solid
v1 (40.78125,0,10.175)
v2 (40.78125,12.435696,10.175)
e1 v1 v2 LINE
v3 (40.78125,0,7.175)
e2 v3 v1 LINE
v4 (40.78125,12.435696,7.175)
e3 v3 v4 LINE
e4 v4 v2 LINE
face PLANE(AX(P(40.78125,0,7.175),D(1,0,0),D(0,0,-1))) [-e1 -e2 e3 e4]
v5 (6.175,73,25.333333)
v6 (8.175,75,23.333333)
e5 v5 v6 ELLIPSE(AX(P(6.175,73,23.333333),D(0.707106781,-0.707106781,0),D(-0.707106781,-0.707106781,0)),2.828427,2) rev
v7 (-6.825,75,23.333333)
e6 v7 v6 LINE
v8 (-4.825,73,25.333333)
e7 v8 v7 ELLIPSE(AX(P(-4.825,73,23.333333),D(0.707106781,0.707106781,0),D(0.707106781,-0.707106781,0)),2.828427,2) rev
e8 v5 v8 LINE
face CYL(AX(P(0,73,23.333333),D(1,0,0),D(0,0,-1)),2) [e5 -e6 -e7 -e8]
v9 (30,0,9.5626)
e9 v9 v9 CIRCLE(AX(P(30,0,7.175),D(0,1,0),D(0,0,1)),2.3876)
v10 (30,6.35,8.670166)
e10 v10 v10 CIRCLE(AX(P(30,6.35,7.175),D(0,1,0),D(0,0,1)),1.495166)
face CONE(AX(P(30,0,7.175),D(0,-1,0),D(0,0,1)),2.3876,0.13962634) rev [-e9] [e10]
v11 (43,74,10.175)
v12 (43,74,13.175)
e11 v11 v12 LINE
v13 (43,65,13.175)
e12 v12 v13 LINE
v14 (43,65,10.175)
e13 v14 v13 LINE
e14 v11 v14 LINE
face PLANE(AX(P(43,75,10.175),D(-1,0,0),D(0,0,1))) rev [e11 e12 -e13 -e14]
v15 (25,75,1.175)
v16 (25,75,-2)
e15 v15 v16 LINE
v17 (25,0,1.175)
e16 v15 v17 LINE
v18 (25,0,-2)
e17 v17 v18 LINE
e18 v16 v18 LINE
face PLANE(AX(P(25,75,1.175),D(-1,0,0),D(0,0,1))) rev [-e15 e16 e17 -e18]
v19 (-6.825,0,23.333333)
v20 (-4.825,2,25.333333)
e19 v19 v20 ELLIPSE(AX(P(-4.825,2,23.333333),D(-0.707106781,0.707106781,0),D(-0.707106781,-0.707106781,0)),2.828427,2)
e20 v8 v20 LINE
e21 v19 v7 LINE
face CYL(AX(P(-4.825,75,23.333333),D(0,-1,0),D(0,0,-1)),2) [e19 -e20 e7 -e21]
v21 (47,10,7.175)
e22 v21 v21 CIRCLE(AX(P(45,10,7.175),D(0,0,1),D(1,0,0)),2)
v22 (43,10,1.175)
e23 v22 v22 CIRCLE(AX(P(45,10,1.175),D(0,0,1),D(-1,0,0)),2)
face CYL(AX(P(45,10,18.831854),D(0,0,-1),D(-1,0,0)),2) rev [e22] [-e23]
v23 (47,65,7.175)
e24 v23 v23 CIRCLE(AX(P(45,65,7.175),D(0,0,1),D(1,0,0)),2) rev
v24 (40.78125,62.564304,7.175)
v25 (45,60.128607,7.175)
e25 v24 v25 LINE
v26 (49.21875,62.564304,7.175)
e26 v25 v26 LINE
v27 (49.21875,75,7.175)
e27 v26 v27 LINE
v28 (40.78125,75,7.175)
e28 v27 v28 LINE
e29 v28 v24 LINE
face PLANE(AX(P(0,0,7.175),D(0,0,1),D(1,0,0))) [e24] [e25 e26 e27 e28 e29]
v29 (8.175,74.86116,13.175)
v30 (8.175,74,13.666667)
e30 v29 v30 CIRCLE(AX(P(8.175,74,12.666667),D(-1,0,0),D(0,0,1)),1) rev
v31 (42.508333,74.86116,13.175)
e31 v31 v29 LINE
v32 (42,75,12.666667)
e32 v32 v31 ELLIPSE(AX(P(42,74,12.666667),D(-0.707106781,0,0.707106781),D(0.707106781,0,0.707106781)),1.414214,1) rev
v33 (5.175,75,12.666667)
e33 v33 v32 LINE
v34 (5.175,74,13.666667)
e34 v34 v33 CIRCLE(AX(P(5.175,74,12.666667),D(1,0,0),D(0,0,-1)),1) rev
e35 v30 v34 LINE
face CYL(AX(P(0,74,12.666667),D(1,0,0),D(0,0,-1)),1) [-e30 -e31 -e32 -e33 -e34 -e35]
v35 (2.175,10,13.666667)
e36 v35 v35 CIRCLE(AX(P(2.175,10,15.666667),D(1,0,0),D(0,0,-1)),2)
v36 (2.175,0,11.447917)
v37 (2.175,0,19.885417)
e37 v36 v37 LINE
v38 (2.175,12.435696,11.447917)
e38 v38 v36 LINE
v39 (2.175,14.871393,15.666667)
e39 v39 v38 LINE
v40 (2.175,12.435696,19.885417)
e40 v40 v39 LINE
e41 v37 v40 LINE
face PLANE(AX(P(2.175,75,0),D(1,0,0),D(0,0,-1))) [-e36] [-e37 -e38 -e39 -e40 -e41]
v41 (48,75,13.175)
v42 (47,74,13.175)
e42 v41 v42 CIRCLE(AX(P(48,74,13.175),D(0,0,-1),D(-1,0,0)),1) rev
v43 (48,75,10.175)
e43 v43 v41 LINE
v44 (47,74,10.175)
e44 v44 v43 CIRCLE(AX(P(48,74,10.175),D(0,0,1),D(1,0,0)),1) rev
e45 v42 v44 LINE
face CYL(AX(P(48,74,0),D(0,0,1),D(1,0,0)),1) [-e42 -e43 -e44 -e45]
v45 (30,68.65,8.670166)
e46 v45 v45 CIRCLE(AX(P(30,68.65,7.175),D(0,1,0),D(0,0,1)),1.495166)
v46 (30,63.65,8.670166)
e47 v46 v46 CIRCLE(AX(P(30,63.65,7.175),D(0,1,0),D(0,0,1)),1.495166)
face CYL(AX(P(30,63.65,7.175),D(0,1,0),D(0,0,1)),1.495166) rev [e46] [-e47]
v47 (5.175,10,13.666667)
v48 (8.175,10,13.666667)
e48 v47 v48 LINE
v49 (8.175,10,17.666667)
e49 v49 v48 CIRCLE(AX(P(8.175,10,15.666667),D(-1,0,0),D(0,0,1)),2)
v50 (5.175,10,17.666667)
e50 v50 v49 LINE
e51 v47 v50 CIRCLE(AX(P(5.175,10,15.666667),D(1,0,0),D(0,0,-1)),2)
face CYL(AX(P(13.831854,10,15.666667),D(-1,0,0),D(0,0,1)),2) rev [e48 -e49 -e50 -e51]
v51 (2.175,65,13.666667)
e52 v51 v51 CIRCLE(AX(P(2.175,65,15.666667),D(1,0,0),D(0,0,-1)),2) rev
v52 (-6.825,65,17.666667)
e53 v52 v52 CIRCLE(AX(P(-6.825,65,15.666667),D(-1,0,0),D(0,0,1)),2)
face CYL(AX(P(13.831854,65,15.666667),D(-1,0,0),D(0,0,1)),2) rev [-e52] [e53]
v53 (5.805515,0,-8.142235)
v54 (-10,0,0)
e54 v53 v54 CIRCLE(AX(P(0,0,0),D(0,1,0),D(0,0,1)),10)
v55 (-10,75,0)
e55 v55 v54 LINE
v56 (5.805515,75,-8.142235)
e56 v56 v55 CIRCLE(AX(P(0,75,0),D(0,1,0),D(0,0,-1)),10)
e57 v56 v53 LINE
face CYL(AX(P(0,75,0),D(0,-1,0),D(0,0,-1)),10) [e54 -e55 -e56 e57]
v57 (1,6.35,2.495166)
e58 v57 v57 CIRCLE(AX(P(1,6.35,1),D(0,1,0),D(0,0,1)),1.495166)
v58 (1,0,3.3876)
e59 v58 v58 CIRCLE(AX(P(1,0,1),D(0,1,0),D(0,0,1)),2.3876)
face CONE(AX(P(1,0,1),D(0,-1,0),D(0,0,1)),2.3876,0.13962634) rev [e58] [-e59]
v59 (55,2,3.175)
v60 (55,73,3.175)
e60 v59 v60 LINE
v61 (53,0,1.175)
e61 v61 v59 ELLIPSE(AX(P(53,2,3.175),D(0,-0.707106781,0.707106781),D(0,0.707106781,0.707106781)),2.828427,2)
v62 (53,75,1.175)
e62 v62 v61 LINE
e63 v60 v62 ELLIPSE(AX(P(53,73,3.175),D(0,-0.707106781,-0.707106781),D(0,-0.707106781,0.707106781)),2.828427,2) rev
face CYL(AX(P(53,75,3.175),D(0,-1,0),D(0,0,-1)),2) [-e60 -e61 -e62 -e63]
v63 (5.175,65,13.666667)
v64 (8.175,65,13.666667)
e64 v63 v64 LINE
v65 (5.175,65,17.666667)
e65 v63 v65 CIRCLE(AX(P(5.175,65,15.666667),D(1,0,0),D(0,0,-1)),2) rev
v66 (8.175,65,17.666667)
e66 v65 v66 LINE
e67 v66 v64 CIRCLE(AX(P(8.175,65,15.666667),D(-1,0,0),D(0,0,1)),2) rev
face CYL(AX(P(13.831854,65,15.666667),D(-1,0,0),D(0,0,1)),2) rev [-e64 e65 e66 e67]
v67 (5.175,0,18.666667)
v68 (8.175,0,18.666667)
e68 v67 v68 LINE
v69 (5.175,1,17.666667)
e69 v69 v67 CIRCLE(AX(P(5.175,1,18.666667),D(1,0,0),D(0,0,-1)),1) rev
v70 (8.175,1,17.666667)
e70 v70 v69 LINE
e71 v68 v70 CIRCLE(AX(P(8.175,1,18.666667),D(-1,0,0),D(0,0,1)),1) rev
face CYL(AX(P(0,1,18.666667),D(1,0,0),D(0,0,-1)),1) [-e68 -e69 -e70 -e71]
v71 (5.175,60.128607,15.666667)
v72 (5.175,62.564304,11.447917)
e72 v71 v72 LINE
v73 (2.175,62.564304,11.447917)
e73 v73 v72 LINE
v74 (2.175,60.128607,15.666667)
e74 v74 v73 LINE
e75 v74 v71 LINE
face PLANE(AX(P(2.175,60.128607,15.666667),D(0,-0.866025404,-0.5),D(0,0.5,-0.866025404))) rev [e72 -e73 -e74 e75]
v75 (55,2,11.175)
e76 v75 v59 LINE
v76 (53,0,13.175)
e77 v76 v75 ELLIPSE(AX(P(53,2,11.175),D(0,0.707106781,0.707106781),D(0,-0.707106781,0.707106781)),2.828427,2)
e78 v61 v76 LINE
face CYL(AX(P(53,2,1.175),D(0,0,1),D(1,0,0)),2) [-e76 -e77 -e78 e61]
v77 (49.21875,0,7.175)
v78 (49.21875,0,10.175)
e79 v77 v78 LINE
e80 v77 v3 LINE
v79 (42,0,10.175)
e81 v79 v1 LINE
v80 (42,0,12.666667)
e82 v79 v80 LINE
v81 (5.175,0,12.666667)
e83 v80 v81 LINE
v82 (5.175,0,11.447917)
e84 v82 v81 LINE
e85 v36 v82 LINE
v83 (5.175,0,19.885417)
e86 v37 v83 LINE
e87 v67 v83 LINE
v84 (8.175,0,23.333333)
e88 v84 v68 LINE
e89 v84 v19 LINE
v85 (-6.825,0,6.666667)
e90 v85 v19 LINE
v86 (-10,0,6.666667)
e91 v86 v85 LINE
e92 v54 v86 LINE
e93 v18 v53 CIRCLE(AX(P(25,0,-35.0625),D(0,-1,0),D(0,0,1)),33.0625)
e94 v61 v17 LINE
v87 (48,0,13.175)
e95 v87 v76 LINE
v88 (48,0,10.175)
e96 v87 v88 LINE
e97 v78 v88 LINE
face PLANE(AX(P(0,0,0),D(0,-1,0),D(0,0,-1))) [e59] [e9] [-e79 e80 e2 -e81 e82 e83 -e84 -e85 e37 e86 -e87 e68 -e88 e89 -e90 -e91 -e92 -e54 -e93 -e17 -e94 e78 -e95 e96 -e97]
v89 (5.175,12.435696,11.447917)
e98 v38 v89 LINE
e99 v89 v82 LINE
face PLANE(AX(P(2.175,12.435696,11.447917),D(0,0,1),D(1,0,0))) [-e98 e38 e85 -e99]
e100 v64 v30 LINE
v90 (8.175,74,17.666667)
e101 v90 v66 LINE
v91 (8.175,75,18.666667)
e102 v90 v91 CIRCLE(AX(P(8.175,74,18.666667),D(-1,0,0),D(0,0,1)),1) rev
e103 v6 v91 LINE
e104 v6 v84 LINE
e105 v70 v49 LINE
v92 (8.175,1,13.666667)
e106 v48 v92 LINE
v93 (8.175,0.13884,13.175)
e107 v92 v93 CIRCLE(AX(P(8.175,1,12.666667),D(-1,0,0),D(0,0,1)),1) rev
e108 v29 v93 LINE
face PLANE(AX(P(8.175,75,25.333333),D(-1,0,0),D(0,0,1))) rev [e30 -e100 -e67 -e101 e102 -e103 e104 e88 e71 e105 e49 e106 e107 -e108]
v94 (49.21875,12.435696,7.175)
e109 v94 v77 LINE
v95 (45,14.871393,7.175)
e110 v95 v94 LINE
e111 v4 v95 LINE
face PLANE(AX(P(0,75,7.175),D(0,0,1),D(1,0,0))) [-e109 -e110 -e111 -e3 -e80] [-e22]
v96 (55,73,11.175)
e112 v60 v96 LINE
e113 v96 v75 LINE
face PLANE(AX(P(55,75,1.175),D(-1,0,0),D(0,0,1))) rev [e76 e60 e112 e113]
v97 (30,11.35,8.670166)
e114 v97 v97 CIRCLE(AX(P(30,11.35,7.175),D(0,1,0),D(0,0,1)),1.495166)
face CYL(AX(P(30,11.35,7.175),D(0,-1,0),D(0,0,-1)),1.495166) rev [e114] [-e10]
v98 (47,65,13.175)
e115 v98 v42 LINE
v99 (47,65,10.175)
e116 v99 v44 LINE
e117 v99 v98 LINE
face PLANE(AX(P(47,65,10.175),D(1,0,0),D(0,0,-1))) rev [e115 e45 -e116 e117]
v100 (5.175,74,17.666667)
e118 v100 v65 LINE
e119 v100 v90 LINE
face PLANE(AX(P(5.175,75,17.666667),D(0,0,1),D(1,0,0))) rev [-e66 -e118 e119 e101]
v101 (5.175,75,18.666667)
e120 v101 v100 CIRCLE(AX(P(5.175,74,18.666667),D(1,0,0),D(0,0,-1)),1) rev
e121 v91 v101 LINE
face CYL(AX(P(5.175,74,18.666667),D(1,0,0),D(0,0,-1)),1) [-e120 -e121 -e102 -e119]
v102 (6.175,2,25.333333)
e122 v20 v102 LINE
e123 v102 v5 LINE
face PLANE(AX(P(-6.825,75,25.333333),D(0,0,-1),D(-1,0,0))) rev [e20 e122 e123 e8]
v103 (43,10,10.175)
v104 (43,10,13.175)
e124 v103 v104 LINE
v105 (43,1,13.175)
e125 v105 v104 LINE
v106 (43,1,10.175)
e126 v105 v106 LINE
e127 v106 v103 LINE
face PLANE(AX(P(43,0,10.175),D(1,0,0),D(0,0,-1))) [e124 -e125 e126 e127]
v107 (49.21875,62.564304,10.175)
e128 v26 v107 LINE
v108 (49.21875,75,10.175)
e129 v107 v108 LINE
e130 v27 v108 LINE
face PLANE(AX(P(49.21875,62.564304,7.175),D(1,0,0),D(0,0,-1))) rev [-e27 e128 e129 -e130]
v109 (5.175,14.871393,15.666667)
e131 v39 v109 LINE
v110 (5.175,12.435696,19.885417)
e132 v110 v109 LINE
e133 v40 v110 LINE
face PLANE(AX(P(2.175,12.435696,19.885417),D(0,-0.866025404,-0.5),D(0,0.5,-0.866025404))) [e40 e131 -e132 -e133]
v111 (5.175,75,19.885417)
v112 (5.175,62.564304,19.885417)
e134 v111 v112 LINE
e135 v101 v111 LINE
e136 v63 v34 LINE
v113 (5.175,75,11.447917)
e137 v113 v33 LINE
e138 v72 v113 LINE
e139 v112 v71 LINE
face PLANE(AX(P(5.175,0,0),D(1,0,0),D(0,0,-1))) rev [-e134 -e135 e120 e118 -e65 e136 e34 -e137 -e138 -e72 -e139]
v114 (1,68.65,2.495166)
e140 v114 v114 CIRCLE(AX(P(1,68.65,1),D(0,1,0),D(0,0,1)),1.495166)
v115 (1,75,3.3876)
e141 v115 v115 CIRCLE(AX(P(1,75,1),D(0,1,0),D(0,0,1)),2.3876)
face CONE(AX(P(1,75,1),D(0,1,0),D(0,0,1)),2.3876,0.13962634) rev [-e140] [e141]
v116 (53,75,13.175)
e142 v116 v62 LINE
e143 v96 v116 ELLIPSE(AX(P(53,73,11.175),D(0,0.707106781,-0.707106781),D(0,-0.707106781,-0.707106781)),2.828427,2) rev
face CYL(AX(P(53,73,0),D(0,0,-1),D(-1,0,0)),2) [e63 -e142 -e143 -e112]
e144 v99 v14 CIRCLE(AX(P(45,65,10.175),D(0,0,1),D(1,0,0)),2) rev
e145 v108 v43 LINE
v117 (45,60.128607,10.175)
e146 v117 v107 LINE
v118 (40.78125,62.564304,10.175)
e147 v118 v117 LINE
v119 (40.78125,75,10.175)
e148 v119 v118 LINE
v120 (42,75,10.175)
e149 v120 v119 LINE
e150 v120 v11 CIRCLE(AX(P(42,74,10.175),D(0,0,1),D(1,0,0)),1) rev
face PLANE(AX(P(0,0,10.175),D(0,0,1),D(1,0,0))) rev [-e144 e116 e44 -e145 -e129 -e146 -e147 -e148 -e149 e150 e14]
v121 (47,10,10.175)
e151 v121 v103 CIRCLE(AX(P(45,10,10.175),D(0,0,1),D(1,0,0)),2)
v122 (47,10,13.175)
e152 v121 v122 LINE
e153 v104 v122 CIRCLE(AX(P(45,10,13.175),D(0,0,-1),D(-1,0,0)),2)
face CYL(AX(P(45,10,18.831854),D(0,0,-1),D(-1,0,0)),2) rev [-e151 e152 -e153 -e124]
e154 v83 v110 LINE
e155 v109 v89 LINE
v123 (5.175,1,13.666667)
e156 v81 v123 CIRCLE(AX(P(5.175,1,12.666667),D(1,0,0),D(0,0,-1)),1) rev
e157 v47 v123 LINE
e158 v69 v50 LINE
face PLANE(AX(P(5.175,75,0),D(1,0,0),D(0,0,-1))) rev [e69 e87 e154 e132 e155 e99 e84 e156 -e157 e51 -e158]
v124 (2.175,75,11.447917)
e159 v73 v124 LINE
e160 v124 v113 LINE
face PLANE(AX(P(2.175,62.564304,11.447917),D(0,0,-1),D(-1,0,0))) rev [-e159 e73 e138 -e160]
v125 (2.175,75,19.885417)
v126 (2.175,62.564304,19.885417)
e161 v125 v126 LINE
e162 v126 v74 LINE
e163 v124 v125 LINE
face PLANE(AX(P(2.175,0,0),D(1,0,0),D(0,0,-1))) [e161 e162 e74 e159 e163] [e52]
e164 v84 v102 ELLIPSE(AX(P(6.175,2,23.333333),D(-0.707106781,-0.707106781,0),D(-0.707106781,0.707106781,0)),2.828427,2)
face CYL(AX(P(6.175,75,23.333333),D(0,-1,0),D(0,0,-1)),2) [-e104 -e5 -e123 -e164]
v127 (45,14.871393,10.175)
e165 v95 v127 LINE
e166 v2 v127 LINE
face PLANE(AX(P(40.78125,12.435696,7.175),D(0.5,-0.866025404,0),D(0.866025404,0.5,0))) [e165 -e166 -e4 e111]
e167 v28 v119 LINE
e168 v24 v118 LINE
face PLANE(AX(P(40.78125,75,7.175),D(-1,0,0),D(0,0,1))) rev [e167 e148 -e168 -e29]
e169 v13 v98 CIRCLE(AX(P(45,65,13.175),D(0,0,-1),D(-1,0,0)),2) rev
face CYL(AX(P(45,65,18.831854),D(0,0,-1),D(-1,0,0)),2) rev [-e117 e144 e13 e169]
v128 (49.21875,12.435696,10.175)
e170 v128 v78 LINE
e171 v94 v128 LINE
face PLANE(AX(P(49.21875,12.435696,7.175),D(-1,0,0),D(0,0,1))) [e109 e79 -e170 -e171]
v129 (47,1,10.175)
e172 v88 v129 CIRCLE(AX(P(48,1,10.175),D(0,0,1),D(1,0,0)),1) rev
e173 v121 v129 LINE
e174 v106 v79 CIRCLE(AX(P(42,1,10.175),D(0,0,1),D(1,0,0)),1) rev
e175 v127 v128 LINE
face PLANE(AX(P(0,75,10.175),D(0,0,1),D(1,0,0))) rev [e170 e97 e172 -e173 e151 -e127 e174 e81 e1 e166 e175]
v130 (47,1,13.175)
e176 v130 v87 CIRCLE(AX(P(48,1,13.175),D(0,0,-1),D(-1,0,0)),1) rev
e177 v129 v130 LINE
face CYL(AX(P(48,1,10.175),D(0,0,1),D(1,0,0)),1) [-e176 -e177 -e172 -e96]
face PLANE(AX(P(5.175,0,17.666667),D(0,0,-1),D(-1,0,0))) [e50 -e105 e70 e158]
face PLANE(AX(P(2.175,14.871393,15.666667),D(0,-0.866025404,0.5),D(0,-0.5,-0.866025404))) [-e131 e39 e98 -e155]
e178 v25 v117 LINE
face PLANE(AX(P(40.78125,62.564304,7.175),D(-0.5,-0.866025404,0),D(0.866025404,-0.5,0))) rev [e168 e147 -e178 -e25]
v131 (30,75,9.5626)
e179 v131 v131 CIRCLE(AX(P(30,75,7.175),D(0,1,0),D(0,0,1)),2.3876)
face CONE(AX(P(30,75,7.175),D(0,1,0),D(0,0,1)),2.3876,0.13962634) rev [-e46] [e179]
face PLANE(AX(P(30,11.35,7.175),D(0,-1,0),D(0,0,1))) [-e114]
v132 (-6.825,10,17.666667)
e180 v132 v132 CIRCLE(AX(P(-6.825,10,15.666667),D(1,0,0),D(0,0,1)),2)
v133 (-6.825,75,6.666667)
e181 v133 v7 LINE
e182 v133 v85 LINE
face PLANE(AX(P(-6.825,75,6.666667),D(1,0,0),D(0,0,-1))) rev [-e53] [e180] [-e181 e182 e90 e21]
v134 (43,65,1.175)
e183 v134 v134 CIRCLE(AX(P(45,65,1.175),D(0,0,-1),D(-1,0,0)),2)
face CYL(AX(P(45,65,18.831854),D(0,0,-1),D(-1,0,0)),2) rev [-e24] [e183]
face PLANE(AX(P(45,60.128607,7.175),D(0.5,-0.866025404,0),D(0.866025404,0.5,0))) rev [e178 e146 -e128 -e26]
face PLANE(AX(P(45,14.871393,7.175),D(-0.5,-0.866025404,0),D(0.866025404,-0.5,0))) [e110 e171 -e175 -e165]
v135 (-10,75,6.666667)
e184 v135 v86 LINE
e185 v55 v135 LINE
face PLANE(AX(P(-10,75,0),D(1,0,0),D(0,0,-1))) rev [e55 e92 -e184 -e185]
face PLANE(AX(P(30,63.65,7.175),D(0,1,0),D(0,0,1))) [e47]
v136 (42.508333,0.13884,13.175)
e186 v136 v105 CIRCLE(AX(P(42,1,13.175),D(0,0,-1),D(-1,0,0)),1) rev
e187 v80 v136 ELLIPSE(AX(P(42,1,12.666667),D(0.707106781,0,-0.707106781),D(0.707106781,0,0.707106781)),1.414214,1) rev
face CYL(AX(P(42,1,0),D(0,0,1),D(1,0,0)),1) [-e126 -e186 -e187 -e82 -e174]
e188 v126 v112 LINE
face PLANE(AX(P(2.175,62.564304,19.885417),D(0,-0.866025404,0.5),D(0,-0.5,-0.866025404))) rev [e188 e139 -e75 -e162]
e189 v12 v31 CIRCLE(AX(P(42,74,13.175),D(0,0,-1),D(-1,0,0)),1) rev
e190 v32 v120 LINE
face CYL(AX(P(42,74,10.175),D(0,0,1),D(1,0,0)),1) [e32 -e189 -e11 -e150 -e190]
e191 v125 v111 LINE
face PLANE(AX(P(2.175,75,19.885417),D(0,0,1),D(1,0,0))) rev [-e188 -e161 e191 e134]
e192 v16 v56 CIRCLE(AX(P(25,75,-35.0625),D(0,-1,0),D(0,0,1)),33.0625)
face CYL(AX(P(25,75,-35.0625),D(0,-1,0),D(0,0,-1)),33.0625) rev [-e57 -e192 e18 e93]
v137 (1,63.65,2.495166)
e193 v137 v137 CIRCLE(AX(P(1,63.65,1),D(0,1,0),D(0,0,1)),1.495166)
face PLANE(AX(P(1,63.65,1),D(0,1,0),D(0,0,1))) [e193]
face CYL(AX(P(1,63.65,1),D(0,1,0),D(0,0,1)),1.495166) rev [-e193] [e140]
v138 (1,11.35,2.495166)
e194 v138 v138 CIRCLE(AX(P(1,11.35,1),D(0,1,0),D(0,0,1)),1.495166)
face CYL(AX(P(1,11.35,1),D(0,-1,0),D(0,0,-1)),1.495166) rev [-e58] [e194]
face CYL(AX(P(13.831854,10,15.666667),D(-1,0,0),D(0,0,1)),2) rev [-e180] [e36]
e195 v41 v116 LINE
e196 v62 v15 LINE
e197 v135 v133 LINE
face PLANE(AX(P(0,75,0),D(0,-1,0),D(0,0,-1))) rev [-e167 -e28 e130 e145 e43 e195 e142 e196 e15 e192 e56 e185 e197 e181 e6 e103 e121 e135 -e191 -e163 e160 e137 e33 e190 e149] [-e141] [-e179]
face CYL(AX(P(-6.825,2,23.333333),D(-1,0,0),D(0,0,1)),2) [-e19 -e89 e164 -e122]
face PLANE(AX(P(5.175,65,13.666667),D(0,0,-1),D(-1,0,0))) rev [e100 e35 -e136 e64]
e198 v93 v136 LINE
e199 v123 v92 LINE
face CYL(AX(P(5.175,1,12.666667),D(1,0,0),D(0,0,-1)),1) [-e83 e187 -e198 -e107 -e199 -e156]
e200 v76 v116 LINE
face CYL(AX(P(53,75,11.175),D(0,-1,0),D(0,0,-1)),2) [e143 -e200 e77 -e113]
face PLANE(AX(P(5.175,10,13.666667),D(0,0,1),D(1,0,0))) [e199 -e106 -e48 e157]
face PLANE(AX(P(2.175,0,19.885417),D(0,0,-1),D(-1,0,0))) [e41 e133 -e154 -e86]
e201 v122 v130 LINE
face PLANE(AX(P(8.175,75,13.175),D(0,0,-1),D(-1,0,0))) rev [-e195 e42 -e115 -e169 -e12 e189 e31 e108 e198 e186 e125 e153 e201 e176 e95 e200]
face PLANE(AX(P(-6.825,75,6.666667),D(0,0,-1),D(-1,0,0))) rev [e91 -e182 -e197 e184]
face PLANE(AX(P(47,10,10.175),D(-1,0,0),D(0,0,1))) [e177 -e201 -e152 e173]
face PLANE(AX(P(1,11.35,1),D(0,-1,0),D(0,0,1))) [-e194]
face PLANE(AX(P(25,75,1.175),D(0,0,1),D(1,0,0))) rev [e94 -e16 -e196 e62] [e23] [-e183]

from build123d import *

# Parameters (mm, degrees)
BOSS_EXTRUDE1_DEPTH          = 75
SKETCH2_R                    = 2
CUT_EXTRUDE1_DEPTH           = 15
SKETCH4_R                    = 2
CUT_EXTRUDE2_DEPTH           = 12
SKETCH3_R                    = 2.3876
CUT_EXTRUDE3_DEPTH           = 6.35
CUT_EXTRUDE3_DRAFT           = -8
CUT_EXTRUDE3_PROFILE_2_DEPTH = 6.35
CUT_EXTRUDE3_PROFILE_2_DRAFT = -8
CUT_EXTRUDE4_START           = -3
CUT_EXTRUDE4_DEPTH           = 3
CUT_EXTRUDE5_START           = -3
CUT_EXTRUDE5_DEPTH           = 3
CUT_EXTRUDE6_START           = -3
CUT_EXTRUDE6_DEPTH           = 3
CUT_EXTRUDE7_START           = -3
CUT_EXTRUDE7_DEPTH           = 3
SKETCH9_R                    = 1.4951657
CUT_EXTRUDE8_DEPTH           = 5
MIRROR2_COPY_1_SKETCH_R      = 2.3876
MIRROR2_COPY_1_DEPTH         = 6.35
MIRROR2_COPY_1_DRAFT         = -8
MIRROR2_COPY_2_SKETCH_R      = 2.3876
MIRROR2_COPY_2_DEPTH         = 6.35
MIRROR2_COPY_2_DRAFT         = -8
MIRROR2_COPY_3_SKETCH_R      = 2.3876
MIRROR2_COPY_3_DEPTH         = 6.35
MIRROR2_COPY_3_DRAFT         = -8
FILLET2_START                = 5.175
FILLET2_DEPTH                = 42.1845
FILLET2_START_2              = 10.175
FILLET2_2_DEPTH              = 3.491666667
FILLET2_3_DEPTH              = 37.825
FILLET3_R                    = 2


with BuildPart() as part:
    # Sketch1 → Boss-Extrude1 (new body)
    with BuildSketch(Plane(origin=(0, 0, 0), x_dir=(1, 0, 0), z_dir=(0, 1, 0))):
        with BuildLine():
            Line((-6.825, -6.666666667), (-6.825, -25.333333333))
            Line((-6.825, -25.333333333), (8.175, -25.333333333))
            Line((8.175, -25.333333333), (8.175, -13.175))
            Line((8.175, -13.175), (55, -13.175))
            Line((55, -13.175), (55, -1.175))
            Line((55, -1.175), (25, -1.175))
            Line((25, -1.175), (25, 2))
            ThreePointArc((25, 2), (14.923352523, 3.572976633), (5.805515239, 8.142235123))
            ThreePointArc((5.805515239, 8.142235123), (3.047757271, 9.524241472), (0, 10))
            ThreePointArc((0, 10), (-7.071067812, 7.071067812), (-10, 0))
            Line((-10, 0), (-10, -6.666666667))
            Line((-10, -6.666666667), (-6.825, -6.666666667))
        make_face()
    extrude(amount=BOSS_EXTRUDE1_DEPTH)

    # Sketch2 → Cut-Extrude1 (cut)
    with BuildSketch(Plane.ZY.offset(6.825)):
        with Locations((15.666666667, 65)):
            Circle(SKETCH2_R)
    cut_extrude1 = extrude(amount=-CUT_EXTRUDE1_DEPTH, mode=Mode.SUBTRACT)

    # Sketch4 → Cut-Extrude2 (cut)
    with BuildSketch(Plane(origin=(0, 0, 1.175), x_dir=(-1, 0, 0), z_dir=(0, 0, -1))):
        with Locations((-45, 65)):
            Circle(SKETCH4_R)
    cut_extrude2 = extrude(amount=-CUT_EXTRUDE2_DEPTH, mode=Mode.SUBTRACT)


with BuildPart() as cut_extrude3_tool:
    # Sketch3 → Cut-Extrude3 (with draft: the straight prism first)
    with BuildSketch(Plane(origin=(0, 75, 0), x_dir=(1, 0, 0), z_dir=(0, 1, 0))):
        with Locations((1, -1)):
            Circle(SKETCH3_R)
    extrude(amount=-CUT_EXTRUDE3_DEPTH)
    # Cut-Extrude3: the draft: its side faces are tilted about the plane it starts from
    cut_extrude3_sides = [cut_extrude3_tool.faces().sort_by_distance(p)[0] for p in [
        (-1.3876, 71.825, 1),
    ]]
    draft(cut_extrude3_sides, Plane(origin=(0, 75, 0), x_dir=(1, 0, 0), z_dir=(0, 1, 0)), CUT_EXTRUDE3_DRAFT)


with BuildPart() as part_1:
    add(part.part)

    # Cut-Extrude3: cut by cut_extrude3_tool
    add(cut_extrude3_tool.part, mode=Mode.SUBTRACT)


with BuildPart() as cut_extrude3_profile_2_tool:
    # Sketch3 → Cut-Extrude3 profile 2 (with draft: the straight prism first)
    with BuildSketch(Plane(origin=(0, 75, 0), x_dir=(1, 0, 0), z_dir=(0, 1, 0))):
        with Locations((30, -7.175)):
            Circle(SKETCH3_R)
    extrude(amount=-CUT_EXTRUDE3_PROFILE_2_DEPTH)
    # Cut-Extrude3 profile 2: the draft: its side faces are tilted about the plane it starts from
    cut_extrude3_profile_2_sides = [cut_extrude3_profile_2_tool.faces().sort_by_distance(p)[0] for p in [
        (27.6124, 71.825, 7.175),
    ]]
    draft(cut_extrude3_profile_2_sides, Plane(origin=(0, 75, 0), x_dir=(1, 0, 0), z_dir=(0, 1, 0)), CUT_EXTRUDE3_PROFILE_2_DRAFT)


with BuildPart() as part_2:
    add(part_1.part)

    # Cut-Extrude3 profile 2: cut by cut_extrude3_profile_2_tool
    add(cut_extrude3_profile_2_tool.part, mode=Mode.SUBTRACT)

    # Sketch5 → Cut-Extrude4 (cut)
    with BuildSketch(Plane(origin=(8.175, 0, 0), x_dir=(0, 0, -1), z_dir=(1, 0, 0)).offset(CUT_EXTRUDE4_START)):
        Polygon((-19.885416667, 62.564303552), (-15.666666667, 60.128607104), (-11.447916667, 62.564303552), (-11.447916667, 75), (-19.885416667, 75), align=None)
    cut_extrude4 = extrude(amount=-CUT_EXTRUDE4_DEPTH, mode=Mode.SUBTRACT)

    # Sketch6 → Cut-Extrude5 (cut)
    with BuildSketch(Plane(origin=(8.175, 0, 0), x_dir=(0, 0, -1), z_dir=(1, 0, 0)).offset(CUT_EXTRUDE5_START)):
        with BuildLine():
            Line((-13.666666667, 65), (-13.666666667, 75))
            Line((-13.666666667, 75), (-17.666666667, 75))
            Line((-17.666666667, 75), (-17.666666667, 65))
            ThreePointArc((-17.666666667, 65), (-15.666666667, 67), (-13.666666667, 65))
        make_face()
    cut_extrude5 = extrude(amount=CUT_EXTRUDE5_DEPTH, mode=Mode.SUBTRACT)

    # Sketch7 → Cut-Extrude6 (cut)
    with BuildSketch(Plane.XY.offset(13.175).offset(CUT_EXTRUDE6_START)):
        Polygon((40.78125, 62.564303552), (45, 60.128607104), (49.21875, 62.564303552), (49.21875, 75), (40.78125, 75), align=None)
    cut_extrude6 = extrude(amount=-CUT_EXTRUDE6_DEPTH, mode=Mode.SUBTRACT)

    # Sketch8 → Cut-Extrude7 (cut)
    with BuildSketch(Plane.XY.offset(13.175).offset(CUT_EXTRUDE7_START)):
        with BuildLine():
            Line((47, 65), (47, 75))
            Line((47, 75), (43, 75))
            Line((43, 75), (43, 65))
            ThreePointArc((43, 65), (45, 67), (47, 65))
        make_face()
    cut_extrude7 = extrude(amount=CUT_EXTRUDE7_DEPTH, mode=Mode.SUBTRACT)

    # Sketch9 → Cut-Extrude8 (cut)
    with BuildSketch(Plane(origin=(0, 68.65, 0), x_dir=(1, 0, 0), z_dir=(0, 1, 0))):
        with Locations(Location((1, -1, 0), (0, 0, 270))):
            Circle(SKETCH9_R)
        with Locations(Location((30, -7.175, 0), (0, 0, 270))):
            Circle(SKETCH9_R)
    cut_extrude8 = extrude(amount=-CUT_EXTRUDE8_DEPTH, mode=Mode.SUBTRACT)

    # Mirror2: Cut-Extrude1, Cut-Extrude2, Cut-Extrude4, Cut-Extrude5, Cut-Extrude6, Cut-Extrude7, Cut-Extrude8 across plane
    add(cut_extrude1.mirror(Plane.ZX.offset(37.5)), mode=Mode.SUBTRACT)
    add(cut_extrude2.mirror(Plane.ZX.offset(37.5)), mode=Mode.SUBTRACT)
    add(cut_extrude4.mirror(Plane.ZX.offset(37.5)), mode=Mode.SUBTRACT)
    add(cut_extrude5.mirror(Plane.ZX.offset(37.5)), mode=Mode.SUBTRACT)
    add(cut_extrude6.mirror(Plane.ZX.offset(37.5)), mode=Mode.SUBTRACT)
    add(cut_extrude7.mirror(Plane.ZX.offset(37.5)), mode=Mode.SUBTRACT)
    add(cut_extrude8.mirror(Plane.ZX.offset(37.5)), mode=Mode.SUBTRACT)


with BuildPart() as mirror2_copy_1_tool:
    # Mirror2 copy 1 sketch → Mirror2 copy 1 (with draft: the straight prism first)
    with BuildSketch(Plane.XZ):
        with Locations((1, 1)):
            Circle(MIRROR2_COPY_1_SKETCH_R)
    extrude(amount=-MIRROR2_COPY_1_DEPTH)
    # Mirror2 copy 1: the draft: its side faces are tilted about the plane it starts from
    mirror2_copy_1_sides = [mirror2_copy_1_tool.faces().sort_by_distance(p)[0] for p in [
        (-1.3876, 3.175, 1),
    ]]
    draft(mirror2_copy_1_sides, Plane.XZ, MIRROR2_COPY_1_DRAFT)


with BuildPart() as part_3:
    add(part_2.part)

    # Mirror2 copy 1: cut by mirror2_copy_1_tool
    add(mirror2_copy_1_tool.part, mode=Mode.SUBTRACT)


with BuildPart() as mirror2_copy_2_tool:
    # Mirror2 copy 2 sketch → Mirror2 copy 2 (with draft: the straight prism first)
    with BuildSketch(Plane.XZ):
        with Locations((30, 7.175)):
            Circle(MIRROR2_COPY_2_SKETCH_R)
    extrude(amount=-MIRROR2_COPY_2_DEPTH)
    # Mirror2 copy 2: the draft: its side faces are tilted about the plane it starts from
    mirror2_copy_2_sides = [mirror2_copy_2_tool.faces().sort_by_distance(p)[0] for p in [
        (27.6124, 3.175, 7.175),
    ]]
    draft(mirror2_copy_2_sides, Plane.XZ, MIRROR2_COPY_2_DRAFT)


with BuildPart() as part_4:
    add(part_3.part)

    # Mirror2 copy 2: cut by mirror2_copy_2_tool
    add(mirror2_copy_2_tool.part, mode=Mode.SUBTRACT)


with BuildPart() as mirror2_copy_3_tool:
    # Mirror2 copy 3 sketch → Mirror2 copy 3 (with draft: the straight prism first)
    with BuildSketch(Plane.XZ):
        with Locations((30, 7.175)):
            Circle(MIRROR2_COPY_3_SKETCH_R)
    extrude(amount=-MIRROR2_COPY_3_DEPTH)
    # Mirror2 copy 3: the draft: its side faces are tilted about the plane it starts from
    mirror2_copy_3_sides = [mirror2_copy_3_tool.faces().sort_by_distance(p)[0] for p in [
        (27.6124, 3.175, 7.175),
    ]]
    draft(mirror2_copy_3_sides, Plane.XZ, MIRROR2_COPY_3_DRAFT)


with BuildPart() as part_5:
    add(part_4.part)

    # Mirror2 copy 3: cut by mirror2_copy_3_tool
    add(mirror2_copy_3_tool.part, mode=Mode.SUBTRACT)

    # Fillet2: read off the stored shape, not the designer's step
    # Fillet2 outline → Fillet2 (cut)
    with BuildSketch(Plane.YZ.offset(FILLET2_START)):
        with BuildLine():
            Line((1, 13.666666667), (0, 13.666666667))
            Line((0, 13.666666667), (0, 12.666666667))
            ThreePointArc((0, 12.666666667), (0.292893219, 13.373773448), (1, 13.666666667))
        make_face()
        with BuildLine():
            ThreePointArc((1, 17.666666667), (0.292893218, 17.959559886), (0, 18.666666667))
            Line((0, 18.666666667), (0, 17.666666667))
            Line((0, 17.666666667), (1, 17.666666667))
        make_face()
    extrude(amount=FILLET2_DEPTH, mode=Mode.SUBTRACT)

    # Fillet2 2 outline → Fillet2 2 (cut)
    with BuildSketch(Plane.XY.offset(FILLET2_START_2)):
        with BuildLine():
            Line((47, 1), (47, 0))
            Line((47, 0), (47.3595, 0))
            Line((47.3595, 0), (48, 0))
            ThreePointArc((48, 0), (47.292893219, 0.292893219), (47, 1))
        make_face()
        with BuildLine():
            Line((48, 75), (47, 75))
            Line((47, 75), (47, 74))
            ThreePointArc((47, 74), (47.292893219, 74.707106781), (48, 75))
        make_face()
        with BuildLine():
            Line((43, 75), (42, 75))
            ThreePointArc((42, 75), (42.707106781, 74.707106781), (43, 74))
            Line((43, 74), (43, 75))
        make_face()
        with BuildLine():
            ThreePointArc((43, 1), (42.707106781, 0.292893219), (42, 0))
            Line((42, 0), (43, 0))
            Line((43, 0), (43, 1))
        make_face()
    extrude(amount=FILLET2_2_DEPTH, mode=Mode.SUBTRACT)

    # Fillet2 3 outline → Fillet2 3 (cut)
    with BuildSketch(Plane.YZ.offset(FILLET2_START)):
        with BuildLine():
            Line((74, 17.666666667), (75, 17.666666667))
            Line((75, 17.666666667), (75, 18.666666667))
            ThreePointArc((75, 18.666666667), (74.707106782, 17.959559886), (74, 17.666666667))
        make_face()
        with BuildLine():
            Line((75, 12.666666667), (75, 13.666666667))
            Line((75, 13.666666667), (74, 13.666666667))
            ThreePointArc((74, 13.666666667), (74.707106781, 13.373773448), (75, 12.666666667))
        make_face()
    extrude(amount=FILLET2_3_DEPTH, mode=Mode.SUBTRACT)

    # Fillet3
    fillet3_edges = [part_5.edges().sort_by_distance(p)[0] for p in [
        (55, 0, 7.175),
        (0.675, 0, 25.333333333),
        (55, 37.5, 1.175),
        (55, 37.5, 13.175),
        (8.175, 37.5, 25.333333333),
        (-6.825, 37.5, 25.333333333),
        (0.675, 75, 25.333333333),
        (55, 75, 7.175),
    ]]
    fillet(fillet3_edges, radius=FILLET3_R)


solid = part_5.part
